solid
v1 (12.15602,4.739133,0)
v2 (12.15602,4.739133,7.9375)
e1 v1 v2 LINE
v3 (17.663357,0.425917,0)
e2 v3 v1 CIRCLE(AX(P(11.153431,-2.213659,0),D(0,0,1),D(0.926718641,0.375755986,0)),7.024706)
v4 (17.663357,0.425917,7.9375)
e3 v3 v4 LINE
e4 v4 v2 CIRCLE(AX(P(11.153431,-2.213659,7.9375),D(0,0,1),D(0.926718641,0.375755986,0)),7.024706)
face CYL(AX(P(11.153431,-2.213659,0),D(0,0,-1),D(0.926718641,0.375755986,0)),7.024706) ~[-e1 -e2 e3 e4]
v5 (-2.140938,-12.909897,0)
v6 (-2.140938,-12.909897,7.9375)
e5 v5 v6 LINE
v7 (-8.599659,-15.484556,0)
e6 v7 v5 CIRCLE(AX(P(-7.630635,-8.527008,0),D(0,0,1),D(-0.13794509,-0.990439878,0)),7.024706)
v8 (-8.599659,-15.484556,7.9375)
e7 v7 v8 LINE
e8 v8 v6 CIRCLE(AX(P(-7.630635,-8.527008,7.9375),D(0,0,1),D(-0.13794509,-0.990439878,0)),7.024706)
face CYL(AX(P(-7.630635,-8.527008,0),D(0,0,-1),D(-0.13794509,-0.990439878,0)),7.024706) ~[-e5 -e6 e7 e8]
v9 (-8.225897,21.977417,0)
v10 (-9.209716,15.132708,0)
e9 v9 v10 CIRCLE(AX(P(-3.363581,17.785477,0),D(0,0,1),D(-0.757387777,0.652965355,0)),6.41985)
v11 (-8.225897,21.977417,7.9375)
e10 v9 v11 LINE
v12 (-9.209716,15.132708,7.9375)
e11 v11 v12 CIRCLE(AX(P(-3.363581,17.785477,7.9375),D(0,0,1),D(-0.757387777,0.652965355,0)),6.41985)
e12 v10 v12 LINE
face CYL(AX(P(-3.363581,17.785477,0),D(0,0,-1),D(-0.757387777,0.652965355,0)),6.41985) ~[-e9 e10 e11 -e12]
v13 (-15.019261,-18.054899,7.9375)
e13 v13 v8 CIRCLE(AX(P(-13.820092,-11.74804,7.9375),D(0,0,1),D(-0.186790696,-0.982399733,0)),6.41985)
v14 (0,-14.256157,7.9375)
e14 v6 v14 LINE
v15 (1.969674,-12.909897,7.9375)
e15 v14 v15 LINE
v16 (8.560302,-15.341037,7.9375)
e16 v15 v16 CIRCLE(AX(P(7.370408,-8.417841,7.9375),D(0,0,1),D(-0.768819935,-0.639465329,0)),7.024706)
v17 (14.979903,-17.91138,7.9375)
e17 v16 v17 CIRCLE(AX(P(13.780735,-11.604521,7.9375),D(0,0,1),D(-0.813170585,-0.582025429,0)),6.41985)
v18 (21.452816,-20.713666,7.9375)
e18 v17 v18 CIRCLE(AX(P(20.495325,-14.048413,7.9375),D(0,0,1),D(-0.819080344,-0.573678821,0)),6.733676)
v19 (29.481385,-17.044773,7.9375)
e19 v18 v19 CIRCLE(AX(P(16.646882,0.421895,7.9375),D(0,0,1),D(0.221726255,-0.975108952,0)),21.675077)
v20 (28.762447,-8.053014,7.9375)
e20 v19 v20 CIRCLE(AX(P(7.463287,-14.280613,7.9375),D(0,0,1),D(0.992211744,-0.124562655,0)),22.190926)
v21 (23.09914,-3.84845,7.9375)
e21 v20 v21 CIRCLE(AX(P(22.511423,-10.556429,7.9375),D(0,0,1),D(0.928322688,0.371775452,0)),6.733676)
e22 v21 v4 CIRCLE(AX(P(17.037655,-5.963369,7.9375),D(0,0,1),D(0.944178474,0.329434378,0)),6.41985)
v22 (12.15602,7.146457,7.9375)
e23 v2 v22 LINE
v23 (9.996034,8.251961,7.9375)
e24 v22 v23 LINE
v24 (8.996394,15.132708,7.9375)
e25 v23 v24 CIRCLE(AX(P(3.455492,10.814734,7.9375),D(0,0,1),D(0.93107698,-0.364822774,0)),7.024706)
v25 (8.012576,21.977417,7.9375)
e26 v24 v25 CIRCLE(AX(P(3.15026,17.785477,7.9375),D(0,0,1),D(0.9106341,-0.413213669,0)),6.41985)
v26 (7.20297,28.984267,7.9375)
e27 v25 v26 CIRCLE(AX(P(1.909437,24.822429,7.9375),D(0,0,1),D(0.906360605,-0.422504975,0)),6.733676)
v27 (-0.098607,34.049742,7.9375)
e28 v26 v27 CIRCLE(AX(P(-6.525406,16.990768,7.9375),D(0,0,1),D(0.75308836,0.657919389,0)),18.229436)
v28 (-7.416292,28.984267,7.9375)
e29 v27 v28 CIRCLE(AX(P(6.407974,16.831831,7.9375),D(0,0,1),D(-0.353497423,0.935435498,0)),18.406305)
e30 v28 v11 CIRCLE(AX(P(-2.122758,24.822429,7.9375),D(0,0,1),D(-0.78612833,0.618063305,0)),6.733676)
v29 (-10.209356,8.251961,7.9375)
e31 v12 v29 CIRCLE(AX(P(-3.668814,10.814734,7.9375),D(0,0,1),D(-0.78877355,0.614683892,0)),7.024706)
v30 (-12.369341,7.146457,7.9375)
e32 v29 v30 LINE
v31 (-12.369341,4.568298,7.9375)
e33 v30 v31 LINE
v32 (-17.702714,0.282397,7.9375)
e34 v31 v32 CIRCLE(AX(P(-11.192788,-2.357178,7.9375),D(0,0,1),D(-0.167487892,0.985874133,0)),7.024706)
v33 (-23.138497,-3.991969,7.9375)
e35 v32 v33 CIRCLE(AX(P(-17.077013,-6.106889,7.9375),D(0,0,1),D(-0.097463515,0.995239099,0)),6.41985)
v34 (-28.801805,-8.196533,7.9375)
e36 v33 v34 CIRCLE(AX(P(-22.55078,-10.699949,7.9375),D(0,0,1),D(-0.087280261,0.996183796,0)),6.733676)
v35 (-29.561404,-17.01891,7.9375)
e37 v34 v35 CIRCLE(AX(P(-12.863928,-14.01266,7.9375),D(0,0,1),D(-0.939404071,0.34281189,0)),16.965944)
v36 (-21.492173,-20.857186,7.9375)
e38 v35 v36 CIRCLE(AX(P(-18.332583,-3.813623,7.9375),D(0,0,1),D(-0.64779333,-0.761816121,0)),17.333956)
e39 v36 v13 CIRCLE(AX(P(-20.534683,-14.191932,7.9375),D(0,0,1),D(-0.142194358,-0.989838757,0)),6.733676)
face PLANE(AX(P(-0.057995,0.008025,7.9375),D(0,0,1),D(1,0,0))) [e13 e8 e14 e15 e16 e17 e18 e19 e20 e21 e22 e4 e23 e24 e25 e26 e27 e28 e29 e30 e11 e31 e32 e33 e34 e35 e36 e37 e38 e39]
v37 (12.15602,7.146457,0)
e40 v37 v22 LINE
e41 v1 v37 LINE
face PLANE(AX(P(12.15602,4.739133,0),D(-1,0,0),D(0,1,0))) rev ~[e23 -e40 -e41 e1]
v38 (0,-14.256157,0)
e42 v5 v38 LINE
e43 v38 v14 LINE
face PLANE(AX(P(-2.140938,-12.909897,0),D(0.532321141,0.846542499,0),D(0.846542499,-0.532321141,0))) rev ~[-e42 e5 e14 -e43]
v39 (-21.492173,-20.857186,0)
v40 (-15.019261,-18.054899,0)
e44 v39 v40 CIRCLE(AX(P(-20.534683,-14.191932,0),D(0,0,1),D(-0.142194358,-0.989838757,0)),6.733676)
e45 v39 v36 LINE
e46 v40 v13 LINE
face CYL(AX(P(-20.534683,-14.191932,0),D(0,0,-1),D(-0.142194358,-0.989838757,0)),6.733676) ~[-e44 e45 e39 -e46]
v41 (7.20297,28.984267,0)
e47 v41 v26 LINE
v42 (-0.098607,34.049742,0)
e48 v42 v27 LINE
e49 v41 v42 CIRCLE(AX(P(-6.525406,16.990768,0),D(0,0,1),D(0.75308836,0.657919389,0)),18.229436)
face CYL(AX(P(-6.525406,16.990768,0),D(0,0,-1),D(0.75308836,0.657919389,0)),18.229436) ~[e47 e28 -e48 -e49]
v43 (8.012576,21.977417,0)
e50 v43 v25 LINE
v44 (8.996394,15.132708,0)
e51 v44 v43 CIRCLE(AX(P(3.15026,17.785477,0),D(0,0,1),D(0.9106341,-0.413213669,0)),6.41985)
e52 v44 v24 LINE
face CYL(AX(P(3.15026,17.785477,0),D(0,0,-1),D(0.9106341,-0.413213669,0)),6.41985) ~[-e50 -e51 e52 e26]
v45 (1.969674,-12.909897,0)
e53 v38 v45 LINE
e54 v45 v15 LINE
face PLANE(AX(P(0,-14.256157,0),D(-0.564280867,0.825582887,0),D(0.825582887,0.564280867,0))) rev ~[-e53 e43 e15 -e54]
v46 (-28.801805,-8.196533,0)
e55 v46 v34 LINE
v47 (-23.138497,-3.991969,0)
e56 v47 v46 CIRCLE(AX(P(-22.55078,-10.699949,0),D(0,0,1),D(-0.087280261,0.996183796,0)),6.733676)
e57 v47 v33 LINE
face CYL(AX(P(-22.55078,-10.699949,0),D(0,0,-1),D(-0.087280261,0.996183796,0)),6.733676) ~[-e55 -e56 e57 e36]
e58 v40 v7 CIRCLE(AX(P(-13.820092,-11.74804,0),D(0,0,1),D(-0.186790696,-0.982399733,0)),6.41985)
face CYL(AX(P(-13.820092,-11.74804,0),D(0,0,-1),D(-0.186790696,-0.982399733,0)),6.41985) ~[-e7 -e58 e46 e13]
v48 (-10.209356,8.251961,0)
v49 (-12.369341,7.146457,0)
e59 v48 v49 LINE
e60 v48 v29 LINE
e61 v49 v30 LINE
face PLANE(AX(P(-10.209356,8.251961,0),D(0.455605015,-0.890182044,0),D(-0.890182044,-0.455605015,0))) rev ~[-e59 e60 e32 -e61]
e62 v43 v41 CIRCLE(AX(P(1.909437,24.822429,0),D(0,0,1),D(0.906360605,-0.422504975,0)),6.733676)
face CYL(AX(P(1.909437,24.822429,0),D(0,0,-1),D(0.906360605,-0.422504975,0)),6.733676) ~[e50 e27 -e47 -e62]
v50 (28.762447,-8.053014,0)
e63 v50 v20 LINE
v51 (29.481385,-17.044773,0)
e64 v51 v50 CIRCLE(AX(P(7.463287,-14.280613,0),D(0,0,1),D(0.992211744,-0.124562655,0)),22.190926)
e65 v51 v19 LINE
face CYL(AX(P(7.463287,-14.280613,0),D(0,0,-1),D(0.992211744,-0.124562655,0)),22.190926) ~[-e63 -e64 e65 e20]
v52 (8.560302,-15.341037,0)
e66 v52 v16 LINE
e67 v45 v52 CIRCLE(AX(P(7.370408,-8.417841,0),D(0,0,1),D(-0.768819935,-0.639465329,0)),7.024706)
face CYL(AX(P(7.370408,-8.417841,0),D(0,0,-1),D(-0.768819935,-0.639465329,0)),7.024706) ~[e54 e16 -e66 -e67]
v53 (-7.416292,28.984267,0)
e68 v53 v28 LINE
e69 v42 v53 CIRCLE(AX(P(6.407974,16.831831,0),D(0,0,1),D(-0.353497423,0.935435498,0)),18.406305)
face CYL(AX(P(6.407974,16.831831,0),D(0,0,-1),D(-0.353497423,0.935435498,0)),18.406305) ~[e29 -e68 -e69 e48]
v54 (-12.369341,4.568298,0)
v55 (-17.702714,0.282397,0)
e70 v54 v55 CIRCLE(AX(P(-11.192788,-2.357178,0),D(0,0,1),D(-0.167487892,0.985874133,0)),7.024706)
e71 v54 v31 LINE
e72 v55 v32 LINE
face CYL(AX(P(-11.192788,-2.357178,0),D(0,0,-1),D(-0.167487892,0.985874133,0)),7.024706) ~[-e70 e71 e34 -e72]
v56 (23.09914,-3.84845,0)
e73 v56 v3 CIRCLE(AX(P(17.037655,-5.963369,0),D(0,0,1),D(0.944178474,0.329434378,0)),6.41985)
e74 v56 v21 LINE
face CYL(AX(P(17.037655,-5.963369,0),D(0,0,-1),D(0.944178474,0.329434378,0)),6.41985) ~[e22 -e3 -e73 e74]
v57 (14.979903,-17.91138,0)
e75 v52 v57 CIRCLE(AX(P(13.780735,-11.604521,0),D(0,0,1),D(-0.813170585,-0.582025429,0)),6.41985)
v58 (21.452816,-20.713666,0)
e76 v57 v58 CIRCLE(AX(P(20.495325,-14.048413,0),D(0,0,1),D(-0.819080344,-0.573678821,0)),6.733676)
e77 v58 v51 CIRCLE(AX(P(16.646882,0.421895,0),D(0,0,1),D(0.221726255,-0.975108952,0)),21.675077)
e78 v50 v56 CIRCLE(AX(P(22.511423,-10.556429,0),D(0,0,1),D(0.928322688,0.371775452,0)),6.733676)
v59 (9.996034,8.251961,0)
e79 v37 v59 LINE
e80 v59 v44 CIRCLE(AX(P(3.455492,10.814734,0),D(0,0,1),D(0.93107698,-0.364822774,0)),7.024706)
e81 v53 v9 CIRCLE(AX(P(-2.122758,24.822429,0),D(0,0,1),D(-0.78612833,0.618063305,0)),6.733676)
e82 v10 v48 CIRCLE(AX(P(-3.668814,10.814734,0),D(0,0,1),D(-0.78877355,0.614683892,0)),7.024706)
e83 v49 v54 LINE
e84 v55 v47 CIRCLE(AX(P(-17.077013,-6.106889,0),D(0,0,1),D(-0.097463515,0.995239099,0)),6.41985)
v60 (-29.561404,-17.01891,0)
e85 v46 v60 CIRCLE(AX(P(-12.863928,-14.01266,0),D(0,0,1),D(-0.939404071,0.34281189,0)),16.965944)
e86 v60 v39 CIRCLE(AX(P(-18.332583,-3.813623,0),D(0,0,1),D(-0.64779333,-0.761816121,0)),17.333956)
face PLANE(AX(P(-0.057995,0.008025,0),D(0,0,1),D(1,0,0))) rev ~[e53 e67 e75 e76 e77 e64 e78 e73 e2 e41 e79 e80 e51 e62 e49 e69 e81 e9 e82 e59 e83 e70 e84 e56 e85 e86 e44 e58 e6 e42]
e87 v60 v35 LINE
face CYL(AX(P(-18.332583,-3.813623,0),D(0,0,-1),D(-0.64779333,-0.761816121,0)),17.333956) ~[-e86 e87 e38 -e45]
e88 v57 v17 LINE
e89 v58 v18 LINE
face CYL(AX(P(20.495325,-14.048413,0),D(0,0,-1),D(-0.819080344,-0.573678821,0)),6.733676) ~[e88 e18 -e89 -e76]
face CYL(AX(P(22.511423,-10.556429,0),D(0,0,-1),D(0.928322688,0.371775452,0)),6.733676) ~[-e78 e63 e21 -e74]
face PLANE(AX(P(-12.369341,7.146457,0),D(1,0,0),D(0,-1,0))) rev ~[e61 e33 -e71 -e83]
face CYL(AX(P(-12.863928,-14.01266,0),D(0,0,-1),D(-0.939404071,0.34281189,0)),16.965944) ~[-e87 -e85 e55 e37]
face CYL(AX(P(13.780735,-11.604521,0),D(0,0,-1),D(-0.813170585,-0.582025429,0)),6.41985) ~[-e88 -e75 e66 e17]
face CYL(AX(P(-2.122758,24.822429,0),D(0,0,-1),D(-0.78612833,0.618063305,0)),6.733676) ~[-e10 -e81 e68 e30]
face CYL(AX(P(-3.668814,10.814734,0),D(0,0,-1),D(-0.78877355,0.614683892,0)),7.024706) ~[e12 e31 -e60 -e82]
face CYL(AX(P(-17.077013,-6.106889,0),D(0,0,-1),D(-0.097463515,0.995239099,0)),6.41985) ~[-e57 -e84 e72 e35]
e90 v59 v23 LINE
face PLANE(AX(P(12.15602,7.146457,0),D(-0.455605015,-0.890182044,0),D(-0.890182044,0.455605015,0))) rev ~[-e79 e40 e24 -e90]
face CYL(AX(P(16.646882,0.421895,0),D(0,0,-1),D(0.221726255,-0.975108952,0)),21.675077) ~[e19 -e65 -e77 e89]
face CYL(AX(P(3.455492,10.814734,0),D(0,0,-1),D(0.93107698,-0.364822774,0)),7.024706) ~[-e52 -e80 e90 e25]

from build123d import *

# Parameters (mm, degrees)
F1_DEPTH = 7.9375


# Not quite as in the source:
# - a length typed as a fraction of an inch, garbled in the dataset ("3 / 203.2 mm" for 3/8 in), is restored


with BuildPart() as f1:
    # F0 (on Top) → F1 (new body)
    with BuildSketch(Plane.XY):
        with BuildLine():
            ThreePointArc((-0.0986067535, 34.0497419238), (-4.0682176485, 31.9659465467), (-7.4162920937, 28.9842672646))
            ThreePointArc((-7.4162920937, 28.9842672646), (-8.8119305122, 25.5953281623), (-8.2258973271, 21.977417171))
            ThreePointArc((-8.2258973271, 21.977417171), (-9.7181261566, 18.698842434), (-9.2097157612, 15.1327075437))
            ThreePointArc((-9.2097157612, 15.1327075437), (-10.6205392688, 11.8246856933), (-10.2093555033, 8.2519613206))
            Line((-10.2093555033, 8.2519613206), (-12.369341217, 7.1464567445))
            Line((-12.369341217, 7.1464567445), (-12.369341217, 4.6386048198))
            Line((-12.369341217, 4.6386048198), (-12.369341217, 4.5682978211))
            ThreePointArc((-12.369341217, 4.5682978211), (-15.5930977879, 3.1185654947), (-17.7027139134, 0.2823972963))
            ThreePointArc((-17.7027139134, 0.2823972963), (-21.0452825194, -1.0603738309), (-23.1384971151, -3.9919692741))
            ThreePointArc((-23.1384971151, -3.9919692741), (-26.5647165348, -5.2934051439), (-28.80180468, -8.19653302))
            ThreePointArc((-28.80180468, -8.19653302), (-29.7673344436, -12.5572908836), (-29.5614041388, -17.0189104974))
            ThreePointArc((-29.5614041388, -17.0189104974), (-25.7783661022, -19.4669407743), (-21.4921734029, -20.8571857766))
            ThreePointArc((-21.4921734029, -20.8571857766), (-17.8594468391, -20.3713745504), (-15.0192606046, -18.054899429))
            ThreePointArc((-15.0192606046, -18.054899429), (-11.4338171794, -17.7079201351), (-8.5996589687, -15.484556372))
            ThreePointArc((-8.5996589687, -15.484556372), (-5.0294162563, -15.0523544446), (-2.1409380715, -12.9098966718))
            Line((-2.1409380715, -12.9098966718), (0, -14.2561570176))
            Line((0, -14.2561570176), (1.9696742658, -12.9098966718))
            ThreePointArc((1.9696742658, -12.9098966718), (4.9392756736, -15.0084468105), (8.560301624, -15.3410370587))
            ThreePointArc((8.560301624, -15.3410370587), (11.3944598347, -17.5644008218), (14.9799032599, -17.9113801157))
            ThreePointArc((14.9799032599, -17.9113801157), (17.8200894944, -20.2278552371), (21.4528160582, -20.7136664634))
            ThreePointArc((21.4528160582, -20.7136664634), (25.6558468929, -19.2922500665), (29.4813849032, -17.0447733253))
            ThreePointArc((29.4813849032, -17.0447733253), (29.5836204245, -12.511977875), (28.7624473353, -8.0530137067))
            ThreePointArc((28.7624473353, -8.0530137067), (26.5253591901, -5.1498858306), (23.0991397704, -3.8484499608))
            ThreePointArc((23.0991397704, -3.8484499608), (21.0059251747, -0.9168545176), (17.6633565687, 0.4259166096))
            ThreePointArc((17.6633565687, 0.4259166096), (15.4847616458, 3.3168082822), (12.1560195839, 4.739132713))
            Line((12.1560195839, 4.739132713), (12.1560195839, 7.1464567445))
            Line((12.1560195839, 7.1464567445), (9.9960338703, 8.2519613206))
            ThreePointArc((9.9960338703, 8.2519613206), (10.4072176357, 11.8246856933), (8.9963941282, 15.1327075437))
            ThreePointArc((8.9963941282, 15.1327075437), (9.5048045235, 18.698842434), (8.012575694, 21.977417171))
            ThreePointArc((8.012575694, 21.977417171), (8.5986088792, 25.5953281623), (7.2029704606, 28.9842672646))
            ThreePointArc((7.2029704606, 28.9842672646), (3.8655773676, 31.9687453881), (-0.0986067535, 34.0497419238))
        make_face()
    extrude(amount=F1_DEPTH)


solid = f1.part
